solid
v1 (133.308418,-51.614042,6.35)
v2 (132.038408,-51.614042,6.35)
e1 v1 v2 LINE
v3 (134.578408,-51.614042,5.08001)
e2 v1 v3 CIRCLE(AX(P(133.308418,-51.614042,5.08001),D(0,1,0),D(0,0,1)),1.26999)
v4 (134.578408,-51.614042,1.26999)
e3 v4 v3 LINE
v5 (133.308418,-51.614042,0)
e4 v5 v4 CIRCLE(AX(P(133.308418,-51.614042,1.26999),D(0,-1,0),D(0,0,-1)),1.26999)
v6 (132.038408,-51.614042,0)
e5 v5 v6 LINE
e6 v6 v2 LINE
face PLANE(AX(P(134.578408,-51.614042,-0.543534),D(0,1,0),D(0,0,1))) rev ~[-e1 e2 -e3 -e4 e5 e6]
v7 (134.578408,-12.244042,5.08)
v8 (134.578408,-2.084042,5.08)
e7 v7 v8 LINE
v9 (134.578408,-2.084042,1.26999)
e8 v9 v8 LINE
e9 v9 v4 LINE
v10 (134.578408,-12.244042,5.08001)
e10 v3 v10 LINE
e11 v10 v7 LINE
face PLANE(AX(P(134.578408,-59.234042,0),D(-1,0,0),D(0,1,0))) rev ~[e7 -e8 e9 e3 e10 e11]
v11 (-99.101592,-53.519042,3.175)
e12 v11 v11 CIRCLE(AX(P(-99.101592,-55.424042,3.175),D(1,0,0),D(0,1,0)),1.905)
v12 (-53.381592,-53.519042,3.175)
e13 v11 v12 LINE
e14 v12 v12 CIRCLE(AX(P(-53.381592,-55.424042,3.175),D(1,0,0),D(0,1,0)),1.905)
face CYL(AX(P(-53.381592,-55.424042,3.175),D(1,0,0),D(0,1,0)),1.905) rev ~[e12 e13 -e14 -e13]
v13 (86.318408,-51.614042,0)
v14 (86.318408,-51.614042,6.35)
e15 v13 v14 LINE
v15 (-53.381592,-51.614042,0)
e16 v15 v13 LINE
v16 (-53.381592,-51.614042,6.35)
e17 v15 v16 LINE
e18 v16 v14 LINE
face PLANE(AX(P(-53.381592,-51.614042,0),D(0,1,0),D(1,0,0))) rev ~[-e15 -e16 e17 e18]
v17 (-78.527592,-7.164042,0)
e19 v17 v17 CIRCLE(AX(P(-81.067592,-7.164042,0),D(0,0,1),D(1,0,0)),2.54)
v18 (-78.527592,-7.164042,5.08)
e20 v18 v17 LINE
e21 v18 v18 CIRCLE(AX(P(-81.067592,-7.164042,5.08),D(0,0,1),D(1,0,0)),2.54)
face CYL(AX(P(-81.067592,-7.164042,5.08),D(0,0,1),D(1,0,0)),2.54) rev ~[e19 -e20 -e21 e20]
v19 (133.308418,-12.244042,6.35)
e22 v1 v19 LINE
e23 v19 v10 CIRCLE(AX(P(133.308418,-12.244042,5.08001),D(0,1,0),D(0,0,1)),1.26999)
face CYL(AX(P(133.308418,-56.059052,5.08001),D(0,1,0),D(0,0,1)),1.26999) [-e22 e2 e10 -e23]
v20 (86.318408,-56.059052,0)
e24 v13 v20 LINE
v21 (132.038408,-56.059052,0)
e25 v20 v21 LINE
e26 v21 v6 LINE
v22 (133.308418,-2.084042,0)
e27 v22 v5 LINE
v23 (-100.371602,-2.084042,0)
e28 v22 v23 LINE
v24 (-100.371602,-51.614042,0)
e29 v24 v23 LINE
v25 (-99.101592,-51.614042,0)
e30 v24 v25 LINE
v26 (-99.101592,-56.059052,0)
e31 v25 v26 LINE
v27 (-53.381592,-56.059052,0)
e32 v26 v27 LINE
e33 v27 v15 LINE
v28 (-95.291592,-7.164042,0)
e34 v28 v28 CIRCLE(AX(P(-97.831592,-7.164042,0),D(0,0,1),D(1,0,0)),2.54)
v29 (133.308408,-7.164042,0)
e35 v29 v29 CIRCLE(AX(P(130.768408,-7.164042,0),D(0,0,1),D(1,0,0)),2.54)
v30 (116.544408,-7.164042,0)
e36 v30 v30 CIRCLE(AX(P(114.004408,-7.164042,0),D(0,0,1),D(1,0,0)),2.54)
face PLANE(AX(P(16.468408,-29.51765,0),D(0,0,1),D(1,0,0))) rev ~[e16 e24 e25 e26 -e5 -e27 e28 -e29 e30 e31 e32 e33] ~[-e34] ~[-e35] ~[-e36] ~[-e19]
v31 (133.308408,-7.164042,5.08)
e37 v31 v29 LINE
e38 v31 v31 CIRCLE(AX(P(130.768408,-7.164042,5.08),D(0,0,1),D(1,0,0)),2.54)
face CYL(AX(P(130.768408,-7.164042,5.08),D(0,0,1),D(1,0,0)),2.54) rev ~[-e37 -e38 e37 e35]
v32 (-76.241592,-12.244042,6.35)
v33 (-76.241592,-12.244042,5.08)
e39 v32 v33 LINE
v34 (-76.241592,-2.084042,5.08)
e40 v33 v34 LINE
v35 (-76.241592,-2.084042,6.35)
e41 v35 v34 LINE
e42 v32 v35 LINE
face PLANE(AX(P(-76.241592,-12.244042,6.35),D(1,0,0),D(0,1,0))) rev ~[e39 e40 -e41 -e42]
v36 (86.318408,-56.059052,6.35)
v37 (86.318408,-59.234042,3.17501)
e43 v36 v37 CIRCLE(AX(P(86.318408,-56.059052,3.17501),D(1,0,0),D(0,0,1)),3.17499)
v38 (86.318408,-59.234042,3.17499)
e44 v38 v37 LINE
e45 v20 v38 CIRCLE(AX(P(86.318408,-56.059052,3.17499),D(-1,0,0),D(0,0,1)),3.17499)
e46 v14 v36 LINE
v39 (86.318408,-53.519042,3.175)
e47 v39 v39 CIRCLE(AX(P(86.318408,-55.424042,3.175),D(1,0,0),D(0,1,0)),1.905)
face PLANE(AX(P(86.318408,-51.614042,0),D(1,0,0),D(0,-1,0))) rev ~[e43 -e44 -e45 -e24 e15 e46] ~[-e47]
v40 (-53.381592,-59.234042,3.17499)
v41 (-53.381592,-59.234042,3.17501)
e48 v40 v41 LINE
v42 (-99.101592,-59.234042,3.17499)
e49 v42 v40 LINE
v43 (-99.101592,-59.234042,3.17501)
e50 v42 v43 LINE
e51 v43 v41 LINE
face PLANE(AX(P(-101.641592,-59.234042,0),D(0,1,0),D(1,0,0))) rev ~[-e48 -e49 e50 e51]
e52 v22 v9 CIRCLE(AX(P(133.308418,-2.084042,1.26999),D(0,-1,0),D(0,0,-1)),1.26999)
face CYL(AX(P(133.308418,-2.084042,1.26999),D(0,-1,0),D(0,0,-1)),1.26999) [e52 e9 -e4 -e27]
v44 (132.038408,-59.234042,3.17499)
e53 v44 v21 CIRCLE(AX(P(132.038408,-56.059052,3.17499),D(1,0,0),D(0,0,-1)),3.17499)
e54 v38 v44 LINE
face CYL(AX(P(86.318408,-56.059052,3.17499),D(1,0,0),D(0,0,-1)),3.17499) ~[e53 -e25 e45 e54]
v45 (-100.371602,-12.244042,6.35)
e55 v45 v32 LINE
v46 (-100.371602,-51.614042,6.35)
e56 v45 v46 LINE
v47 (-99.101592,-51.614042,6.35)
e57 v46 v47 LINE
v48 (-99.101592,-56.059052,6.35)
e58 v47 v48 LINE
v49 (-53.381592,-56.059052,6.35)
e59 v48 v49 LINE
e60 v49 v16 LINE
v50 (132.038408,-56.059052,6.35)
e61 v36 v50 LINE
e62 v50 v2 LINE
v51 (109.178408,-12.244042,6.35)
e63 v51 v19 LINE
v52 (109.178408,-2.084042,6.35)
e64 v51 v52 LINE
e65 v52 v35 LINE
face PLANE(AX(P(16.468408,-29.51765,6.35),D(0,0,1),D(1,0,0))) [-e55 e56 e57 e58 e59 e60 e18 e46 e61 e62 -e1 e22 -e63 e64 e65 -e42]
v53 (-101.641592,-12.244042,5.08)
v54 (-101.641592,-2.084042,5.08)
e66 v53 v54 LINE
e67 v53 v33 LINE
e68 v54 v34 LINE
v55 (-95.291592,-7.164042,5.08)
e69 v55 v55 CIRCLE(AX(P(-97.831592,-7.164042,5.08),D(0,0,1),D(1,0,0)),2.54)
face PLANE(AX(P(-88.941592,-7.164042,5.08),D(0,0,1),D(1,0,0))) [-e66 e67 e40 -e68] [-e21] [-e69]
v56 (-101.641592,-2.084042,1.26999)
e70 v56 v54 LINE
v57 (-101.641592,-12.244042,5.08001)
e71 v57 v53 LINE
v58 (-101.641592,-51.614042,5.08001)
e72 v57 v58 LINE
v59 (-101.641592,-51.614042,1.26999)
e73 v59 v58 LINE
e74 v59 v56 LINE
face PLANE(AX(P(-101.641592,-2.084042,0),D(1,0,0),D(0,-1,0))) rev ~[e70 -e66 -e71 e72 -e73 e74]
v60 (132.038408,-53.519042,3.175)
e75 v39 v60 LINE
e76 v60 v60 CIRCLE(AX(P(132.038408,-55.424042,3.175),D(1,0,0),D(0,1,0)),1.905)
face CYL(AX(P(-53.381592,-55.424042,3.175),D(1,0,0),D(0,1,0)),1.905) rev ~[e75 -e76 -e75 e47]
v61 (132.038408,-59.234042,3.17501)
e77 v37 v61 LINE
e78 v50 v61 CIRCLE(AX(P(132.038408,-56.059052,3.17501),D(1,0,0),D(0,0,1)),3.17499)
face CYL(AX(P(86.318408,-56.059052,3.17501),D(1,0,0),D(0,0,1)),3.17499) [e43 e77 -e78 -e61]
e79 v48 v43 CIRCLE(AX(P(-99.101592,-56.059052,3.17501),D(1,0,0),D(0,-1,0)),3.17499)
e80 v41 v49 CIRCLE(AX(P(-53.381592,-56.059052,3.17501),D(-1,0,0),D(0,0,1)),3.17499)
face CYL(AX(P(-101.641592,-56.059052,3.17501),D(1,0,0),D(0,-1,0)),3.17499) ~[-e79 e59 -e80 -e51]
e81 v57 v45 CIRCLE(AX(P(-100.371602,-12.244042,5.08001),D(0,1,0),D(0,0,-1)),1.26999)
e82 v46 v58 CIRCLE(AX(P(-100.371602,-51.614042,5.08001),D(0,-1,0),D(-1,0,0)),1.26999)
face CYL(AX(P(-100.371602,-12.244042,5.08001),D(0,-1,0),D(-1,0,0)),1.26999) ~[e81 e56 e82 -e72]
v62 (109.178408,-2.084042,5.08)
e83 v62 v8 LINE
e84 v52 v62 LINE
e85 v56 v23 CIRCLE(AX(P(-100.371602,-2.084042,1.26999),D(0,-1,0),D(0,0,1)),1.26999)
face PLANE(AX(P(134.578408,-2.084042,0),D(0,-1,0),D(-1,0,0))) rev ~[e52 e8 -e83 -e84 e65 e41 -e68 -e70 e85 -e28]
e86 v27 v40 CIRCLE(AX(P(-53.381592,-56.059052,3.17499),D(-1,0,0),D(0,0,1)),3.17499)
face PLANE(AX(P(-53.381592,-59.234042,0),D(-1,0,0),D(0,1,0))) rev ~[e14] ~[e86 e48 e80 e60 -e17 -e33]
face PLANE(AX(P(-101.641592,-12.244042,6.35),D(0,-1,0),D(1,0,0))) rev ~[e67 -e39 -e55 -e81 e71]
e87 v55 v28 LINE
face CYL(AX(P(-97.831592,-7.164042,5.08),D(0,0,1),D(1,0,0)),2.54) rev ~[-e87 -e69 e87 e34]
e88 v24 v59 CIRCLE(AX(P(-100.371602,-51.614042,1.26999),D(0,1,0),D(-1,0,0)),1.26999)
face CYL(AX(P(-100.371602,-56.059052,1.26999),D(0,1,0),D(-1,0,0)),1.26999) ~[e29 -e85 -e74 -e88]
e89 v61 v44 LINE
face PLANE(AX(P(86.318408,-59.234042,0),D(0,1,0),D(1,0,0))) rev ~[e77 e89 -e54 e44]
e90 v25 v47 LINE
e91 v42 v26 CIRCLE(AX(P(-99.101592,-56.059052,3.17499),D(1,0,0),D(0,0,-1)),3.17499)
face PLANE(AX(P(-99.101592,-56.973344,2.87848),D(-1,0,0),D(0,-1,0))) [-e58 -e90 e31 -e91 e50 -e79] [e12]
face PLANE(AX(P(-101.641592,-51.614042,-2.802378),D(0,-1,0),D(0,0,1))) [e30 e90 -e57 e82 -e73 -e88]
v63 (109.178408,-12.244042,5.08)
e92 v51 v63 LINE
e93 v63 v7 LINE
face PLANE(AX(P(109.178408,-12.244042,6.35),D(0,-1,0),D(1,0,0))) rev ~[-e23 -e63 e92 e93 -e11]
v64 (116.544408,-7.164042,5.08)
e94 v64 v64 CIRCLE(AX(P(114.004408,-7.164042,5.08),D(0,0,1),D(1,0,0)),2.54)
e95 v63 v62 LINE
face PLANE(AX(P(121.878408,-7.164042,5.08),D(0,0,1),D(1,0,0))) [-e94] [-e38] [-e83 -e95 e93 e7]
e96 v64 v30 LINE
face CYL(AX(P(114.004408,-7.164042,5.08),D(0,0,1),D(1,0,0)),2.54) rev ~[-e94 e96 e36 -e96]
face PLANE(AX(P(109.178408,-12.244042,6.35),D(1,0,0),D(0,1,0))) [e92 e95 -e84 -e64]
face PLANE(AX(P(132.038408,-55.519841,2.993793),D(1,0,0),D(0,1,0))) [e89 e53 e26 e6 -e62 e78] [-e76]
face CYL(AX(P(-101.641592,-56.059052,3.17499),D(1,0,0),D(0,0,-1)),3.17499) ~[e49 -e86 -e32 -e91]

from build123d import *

# Parameters (mm, degrees)
F1_DEPTH  = 6.35
F2_W      = 25.4
F2_H      = 10.16
F3_DEPTH  = 1.27
F4_R      = 2.54
F5_DEPTH  = 25.4
F6_R      = 2.54
F7_DEPTH  = 25.4
F8_R      = 1.905
F9_DEPTH  = 254
F10_R     = 3.17499
F11_R     = 1.26999
F12_W     = 10.7186027977
F12_H     = 11.3617175813
F13_DEPTH = 2.54
F14_W     = 7.8115976844
F14_H     = 7.0746540246
F15_DEPTH = 2.54


# Not quite as in the source:
# - a fillet or chamfer is up to 0.001 mm smaller than in the source, because OpenCascade refuses the exact size


with BuildPart() as f1:
    # F0 (on Top) → F1 (new body)
    with BuildSketch(Plane.XY):
        Polygon((-53.3815915518, -2.0840423941), (-101.6415915518, -2.0840423941), (-101.6415915518, -51.6140423941), (-101.6415915518, -59.2340423941), (-53.3815915518, -59.2340423941), (-53.3815915518, -51.6140423941), (86.3184084482, -51.6140423941), (86.3184084482, -59.2340423941), (134.5784084482, -59.2340423941), (134.5784084482, -51.6140423941), (134.5784084482, -2.0840423941), (86.3184084482, -2.0840423941), align=None)
    extrude(amount=F1_DEPTH)

    # F2 (on face) → F3 (cut)
    with BuildSketch(Plane.XY.offset(6.35)):
        with Locations((-88.9415915518, -7.1640423941)):
            Rectangle(F2_W, F2_H)
        with Locations((121.8784084482, -7.1640423941)):
            Rectangle(F2_W, F2_H)
    extrude(amount=-F3_DEPTH, mode=Mode.SUBTRACT)

    # F4 (on face) → F5 (cut)
    with BuildSketch(Plane.XY.offset(5.08)):
        with Locations((-97.8315915518, -7.1640423941)):
            Circle(F4_R)
        with Locations((-81.0675915518, -7.1640423941)):
            Circle(F4_R)
    extrude(amount=-F5_DEPTH, mode=Mode.SUBTRACT)

    # F6 (on face) → F7 (cut)
    with BuildSketch(Plane.XY.offset(5.08)):
        with Locations((130.7684084482, -7.1640423941)):
            Circle(F6_R)
        with Locations((114.0044084482, -7.1640423941)):
            Circle(F6_R)
    extrude(amount=-F7_DEPTH, mode=Mode.SUBTRACT)

    # F8 (on face) → F9 (cut, symmetric)
    with BuildSketch(Plane.YZ.offset(-53.3815915518)):
        with Locations((-55.4240423941, 3.175)):
            Circle(F8_R)
    extrude(amount=F9_DEPTH, both=True, mode=Mode.SUBTRACT)

    # F10 (radius 3.175 in the source; OpenCascade refuses exactly that, so slightly less here)
    f10_edges = [f1.edges().sort_by_distance(p)[0] for p in [
        (-77.511592, -59.234042, 6.35),
        (-77.511592, -59.234042, 0),
        (110.448408, -59.234042, 6.35),
        (110.448408, -59.234042, 0),
    ]]
    fillet(f10_edges, radius=F10_R)

    # F11 (radius 1.27 in the source; OpenCascade refuses exactly that, so slightly less here)
    f11_edges = [f1.edges().sort_by_distance(p)[0] for p in [
        (-101.641592, -34.151547, 6.35),
        (134.578408, -34.151547, 6.35),
    ]]
    fillet(f11_edges, radius=F11_R)

    # F12 (on face) → F13 (cut)
    with BuildSketch(Plane(origin=(-101.6415915518, 0, 0), x_dir=(0, -1, 0), z_dir=(-1, 0, 0))):
        with Locations((56.973343793, 2.878480358)):
            Rectangle(F12_W, F12_H)
    extrude(amount=-F13_DEPTH, mode=Mode.SUBTRACT)

    # F14 (on face) → F15 (cut)
    with BuildSketch(Plane.YZ.offset(134.5784084482)):
        with Locations((-55.5198412363, 2.9937927611)):
            Rectangle(F14_W, F14_H)
    extrude(amount=-F15_DEPTH, mode=Mode.SUBTRACT)


solid = f1.part
